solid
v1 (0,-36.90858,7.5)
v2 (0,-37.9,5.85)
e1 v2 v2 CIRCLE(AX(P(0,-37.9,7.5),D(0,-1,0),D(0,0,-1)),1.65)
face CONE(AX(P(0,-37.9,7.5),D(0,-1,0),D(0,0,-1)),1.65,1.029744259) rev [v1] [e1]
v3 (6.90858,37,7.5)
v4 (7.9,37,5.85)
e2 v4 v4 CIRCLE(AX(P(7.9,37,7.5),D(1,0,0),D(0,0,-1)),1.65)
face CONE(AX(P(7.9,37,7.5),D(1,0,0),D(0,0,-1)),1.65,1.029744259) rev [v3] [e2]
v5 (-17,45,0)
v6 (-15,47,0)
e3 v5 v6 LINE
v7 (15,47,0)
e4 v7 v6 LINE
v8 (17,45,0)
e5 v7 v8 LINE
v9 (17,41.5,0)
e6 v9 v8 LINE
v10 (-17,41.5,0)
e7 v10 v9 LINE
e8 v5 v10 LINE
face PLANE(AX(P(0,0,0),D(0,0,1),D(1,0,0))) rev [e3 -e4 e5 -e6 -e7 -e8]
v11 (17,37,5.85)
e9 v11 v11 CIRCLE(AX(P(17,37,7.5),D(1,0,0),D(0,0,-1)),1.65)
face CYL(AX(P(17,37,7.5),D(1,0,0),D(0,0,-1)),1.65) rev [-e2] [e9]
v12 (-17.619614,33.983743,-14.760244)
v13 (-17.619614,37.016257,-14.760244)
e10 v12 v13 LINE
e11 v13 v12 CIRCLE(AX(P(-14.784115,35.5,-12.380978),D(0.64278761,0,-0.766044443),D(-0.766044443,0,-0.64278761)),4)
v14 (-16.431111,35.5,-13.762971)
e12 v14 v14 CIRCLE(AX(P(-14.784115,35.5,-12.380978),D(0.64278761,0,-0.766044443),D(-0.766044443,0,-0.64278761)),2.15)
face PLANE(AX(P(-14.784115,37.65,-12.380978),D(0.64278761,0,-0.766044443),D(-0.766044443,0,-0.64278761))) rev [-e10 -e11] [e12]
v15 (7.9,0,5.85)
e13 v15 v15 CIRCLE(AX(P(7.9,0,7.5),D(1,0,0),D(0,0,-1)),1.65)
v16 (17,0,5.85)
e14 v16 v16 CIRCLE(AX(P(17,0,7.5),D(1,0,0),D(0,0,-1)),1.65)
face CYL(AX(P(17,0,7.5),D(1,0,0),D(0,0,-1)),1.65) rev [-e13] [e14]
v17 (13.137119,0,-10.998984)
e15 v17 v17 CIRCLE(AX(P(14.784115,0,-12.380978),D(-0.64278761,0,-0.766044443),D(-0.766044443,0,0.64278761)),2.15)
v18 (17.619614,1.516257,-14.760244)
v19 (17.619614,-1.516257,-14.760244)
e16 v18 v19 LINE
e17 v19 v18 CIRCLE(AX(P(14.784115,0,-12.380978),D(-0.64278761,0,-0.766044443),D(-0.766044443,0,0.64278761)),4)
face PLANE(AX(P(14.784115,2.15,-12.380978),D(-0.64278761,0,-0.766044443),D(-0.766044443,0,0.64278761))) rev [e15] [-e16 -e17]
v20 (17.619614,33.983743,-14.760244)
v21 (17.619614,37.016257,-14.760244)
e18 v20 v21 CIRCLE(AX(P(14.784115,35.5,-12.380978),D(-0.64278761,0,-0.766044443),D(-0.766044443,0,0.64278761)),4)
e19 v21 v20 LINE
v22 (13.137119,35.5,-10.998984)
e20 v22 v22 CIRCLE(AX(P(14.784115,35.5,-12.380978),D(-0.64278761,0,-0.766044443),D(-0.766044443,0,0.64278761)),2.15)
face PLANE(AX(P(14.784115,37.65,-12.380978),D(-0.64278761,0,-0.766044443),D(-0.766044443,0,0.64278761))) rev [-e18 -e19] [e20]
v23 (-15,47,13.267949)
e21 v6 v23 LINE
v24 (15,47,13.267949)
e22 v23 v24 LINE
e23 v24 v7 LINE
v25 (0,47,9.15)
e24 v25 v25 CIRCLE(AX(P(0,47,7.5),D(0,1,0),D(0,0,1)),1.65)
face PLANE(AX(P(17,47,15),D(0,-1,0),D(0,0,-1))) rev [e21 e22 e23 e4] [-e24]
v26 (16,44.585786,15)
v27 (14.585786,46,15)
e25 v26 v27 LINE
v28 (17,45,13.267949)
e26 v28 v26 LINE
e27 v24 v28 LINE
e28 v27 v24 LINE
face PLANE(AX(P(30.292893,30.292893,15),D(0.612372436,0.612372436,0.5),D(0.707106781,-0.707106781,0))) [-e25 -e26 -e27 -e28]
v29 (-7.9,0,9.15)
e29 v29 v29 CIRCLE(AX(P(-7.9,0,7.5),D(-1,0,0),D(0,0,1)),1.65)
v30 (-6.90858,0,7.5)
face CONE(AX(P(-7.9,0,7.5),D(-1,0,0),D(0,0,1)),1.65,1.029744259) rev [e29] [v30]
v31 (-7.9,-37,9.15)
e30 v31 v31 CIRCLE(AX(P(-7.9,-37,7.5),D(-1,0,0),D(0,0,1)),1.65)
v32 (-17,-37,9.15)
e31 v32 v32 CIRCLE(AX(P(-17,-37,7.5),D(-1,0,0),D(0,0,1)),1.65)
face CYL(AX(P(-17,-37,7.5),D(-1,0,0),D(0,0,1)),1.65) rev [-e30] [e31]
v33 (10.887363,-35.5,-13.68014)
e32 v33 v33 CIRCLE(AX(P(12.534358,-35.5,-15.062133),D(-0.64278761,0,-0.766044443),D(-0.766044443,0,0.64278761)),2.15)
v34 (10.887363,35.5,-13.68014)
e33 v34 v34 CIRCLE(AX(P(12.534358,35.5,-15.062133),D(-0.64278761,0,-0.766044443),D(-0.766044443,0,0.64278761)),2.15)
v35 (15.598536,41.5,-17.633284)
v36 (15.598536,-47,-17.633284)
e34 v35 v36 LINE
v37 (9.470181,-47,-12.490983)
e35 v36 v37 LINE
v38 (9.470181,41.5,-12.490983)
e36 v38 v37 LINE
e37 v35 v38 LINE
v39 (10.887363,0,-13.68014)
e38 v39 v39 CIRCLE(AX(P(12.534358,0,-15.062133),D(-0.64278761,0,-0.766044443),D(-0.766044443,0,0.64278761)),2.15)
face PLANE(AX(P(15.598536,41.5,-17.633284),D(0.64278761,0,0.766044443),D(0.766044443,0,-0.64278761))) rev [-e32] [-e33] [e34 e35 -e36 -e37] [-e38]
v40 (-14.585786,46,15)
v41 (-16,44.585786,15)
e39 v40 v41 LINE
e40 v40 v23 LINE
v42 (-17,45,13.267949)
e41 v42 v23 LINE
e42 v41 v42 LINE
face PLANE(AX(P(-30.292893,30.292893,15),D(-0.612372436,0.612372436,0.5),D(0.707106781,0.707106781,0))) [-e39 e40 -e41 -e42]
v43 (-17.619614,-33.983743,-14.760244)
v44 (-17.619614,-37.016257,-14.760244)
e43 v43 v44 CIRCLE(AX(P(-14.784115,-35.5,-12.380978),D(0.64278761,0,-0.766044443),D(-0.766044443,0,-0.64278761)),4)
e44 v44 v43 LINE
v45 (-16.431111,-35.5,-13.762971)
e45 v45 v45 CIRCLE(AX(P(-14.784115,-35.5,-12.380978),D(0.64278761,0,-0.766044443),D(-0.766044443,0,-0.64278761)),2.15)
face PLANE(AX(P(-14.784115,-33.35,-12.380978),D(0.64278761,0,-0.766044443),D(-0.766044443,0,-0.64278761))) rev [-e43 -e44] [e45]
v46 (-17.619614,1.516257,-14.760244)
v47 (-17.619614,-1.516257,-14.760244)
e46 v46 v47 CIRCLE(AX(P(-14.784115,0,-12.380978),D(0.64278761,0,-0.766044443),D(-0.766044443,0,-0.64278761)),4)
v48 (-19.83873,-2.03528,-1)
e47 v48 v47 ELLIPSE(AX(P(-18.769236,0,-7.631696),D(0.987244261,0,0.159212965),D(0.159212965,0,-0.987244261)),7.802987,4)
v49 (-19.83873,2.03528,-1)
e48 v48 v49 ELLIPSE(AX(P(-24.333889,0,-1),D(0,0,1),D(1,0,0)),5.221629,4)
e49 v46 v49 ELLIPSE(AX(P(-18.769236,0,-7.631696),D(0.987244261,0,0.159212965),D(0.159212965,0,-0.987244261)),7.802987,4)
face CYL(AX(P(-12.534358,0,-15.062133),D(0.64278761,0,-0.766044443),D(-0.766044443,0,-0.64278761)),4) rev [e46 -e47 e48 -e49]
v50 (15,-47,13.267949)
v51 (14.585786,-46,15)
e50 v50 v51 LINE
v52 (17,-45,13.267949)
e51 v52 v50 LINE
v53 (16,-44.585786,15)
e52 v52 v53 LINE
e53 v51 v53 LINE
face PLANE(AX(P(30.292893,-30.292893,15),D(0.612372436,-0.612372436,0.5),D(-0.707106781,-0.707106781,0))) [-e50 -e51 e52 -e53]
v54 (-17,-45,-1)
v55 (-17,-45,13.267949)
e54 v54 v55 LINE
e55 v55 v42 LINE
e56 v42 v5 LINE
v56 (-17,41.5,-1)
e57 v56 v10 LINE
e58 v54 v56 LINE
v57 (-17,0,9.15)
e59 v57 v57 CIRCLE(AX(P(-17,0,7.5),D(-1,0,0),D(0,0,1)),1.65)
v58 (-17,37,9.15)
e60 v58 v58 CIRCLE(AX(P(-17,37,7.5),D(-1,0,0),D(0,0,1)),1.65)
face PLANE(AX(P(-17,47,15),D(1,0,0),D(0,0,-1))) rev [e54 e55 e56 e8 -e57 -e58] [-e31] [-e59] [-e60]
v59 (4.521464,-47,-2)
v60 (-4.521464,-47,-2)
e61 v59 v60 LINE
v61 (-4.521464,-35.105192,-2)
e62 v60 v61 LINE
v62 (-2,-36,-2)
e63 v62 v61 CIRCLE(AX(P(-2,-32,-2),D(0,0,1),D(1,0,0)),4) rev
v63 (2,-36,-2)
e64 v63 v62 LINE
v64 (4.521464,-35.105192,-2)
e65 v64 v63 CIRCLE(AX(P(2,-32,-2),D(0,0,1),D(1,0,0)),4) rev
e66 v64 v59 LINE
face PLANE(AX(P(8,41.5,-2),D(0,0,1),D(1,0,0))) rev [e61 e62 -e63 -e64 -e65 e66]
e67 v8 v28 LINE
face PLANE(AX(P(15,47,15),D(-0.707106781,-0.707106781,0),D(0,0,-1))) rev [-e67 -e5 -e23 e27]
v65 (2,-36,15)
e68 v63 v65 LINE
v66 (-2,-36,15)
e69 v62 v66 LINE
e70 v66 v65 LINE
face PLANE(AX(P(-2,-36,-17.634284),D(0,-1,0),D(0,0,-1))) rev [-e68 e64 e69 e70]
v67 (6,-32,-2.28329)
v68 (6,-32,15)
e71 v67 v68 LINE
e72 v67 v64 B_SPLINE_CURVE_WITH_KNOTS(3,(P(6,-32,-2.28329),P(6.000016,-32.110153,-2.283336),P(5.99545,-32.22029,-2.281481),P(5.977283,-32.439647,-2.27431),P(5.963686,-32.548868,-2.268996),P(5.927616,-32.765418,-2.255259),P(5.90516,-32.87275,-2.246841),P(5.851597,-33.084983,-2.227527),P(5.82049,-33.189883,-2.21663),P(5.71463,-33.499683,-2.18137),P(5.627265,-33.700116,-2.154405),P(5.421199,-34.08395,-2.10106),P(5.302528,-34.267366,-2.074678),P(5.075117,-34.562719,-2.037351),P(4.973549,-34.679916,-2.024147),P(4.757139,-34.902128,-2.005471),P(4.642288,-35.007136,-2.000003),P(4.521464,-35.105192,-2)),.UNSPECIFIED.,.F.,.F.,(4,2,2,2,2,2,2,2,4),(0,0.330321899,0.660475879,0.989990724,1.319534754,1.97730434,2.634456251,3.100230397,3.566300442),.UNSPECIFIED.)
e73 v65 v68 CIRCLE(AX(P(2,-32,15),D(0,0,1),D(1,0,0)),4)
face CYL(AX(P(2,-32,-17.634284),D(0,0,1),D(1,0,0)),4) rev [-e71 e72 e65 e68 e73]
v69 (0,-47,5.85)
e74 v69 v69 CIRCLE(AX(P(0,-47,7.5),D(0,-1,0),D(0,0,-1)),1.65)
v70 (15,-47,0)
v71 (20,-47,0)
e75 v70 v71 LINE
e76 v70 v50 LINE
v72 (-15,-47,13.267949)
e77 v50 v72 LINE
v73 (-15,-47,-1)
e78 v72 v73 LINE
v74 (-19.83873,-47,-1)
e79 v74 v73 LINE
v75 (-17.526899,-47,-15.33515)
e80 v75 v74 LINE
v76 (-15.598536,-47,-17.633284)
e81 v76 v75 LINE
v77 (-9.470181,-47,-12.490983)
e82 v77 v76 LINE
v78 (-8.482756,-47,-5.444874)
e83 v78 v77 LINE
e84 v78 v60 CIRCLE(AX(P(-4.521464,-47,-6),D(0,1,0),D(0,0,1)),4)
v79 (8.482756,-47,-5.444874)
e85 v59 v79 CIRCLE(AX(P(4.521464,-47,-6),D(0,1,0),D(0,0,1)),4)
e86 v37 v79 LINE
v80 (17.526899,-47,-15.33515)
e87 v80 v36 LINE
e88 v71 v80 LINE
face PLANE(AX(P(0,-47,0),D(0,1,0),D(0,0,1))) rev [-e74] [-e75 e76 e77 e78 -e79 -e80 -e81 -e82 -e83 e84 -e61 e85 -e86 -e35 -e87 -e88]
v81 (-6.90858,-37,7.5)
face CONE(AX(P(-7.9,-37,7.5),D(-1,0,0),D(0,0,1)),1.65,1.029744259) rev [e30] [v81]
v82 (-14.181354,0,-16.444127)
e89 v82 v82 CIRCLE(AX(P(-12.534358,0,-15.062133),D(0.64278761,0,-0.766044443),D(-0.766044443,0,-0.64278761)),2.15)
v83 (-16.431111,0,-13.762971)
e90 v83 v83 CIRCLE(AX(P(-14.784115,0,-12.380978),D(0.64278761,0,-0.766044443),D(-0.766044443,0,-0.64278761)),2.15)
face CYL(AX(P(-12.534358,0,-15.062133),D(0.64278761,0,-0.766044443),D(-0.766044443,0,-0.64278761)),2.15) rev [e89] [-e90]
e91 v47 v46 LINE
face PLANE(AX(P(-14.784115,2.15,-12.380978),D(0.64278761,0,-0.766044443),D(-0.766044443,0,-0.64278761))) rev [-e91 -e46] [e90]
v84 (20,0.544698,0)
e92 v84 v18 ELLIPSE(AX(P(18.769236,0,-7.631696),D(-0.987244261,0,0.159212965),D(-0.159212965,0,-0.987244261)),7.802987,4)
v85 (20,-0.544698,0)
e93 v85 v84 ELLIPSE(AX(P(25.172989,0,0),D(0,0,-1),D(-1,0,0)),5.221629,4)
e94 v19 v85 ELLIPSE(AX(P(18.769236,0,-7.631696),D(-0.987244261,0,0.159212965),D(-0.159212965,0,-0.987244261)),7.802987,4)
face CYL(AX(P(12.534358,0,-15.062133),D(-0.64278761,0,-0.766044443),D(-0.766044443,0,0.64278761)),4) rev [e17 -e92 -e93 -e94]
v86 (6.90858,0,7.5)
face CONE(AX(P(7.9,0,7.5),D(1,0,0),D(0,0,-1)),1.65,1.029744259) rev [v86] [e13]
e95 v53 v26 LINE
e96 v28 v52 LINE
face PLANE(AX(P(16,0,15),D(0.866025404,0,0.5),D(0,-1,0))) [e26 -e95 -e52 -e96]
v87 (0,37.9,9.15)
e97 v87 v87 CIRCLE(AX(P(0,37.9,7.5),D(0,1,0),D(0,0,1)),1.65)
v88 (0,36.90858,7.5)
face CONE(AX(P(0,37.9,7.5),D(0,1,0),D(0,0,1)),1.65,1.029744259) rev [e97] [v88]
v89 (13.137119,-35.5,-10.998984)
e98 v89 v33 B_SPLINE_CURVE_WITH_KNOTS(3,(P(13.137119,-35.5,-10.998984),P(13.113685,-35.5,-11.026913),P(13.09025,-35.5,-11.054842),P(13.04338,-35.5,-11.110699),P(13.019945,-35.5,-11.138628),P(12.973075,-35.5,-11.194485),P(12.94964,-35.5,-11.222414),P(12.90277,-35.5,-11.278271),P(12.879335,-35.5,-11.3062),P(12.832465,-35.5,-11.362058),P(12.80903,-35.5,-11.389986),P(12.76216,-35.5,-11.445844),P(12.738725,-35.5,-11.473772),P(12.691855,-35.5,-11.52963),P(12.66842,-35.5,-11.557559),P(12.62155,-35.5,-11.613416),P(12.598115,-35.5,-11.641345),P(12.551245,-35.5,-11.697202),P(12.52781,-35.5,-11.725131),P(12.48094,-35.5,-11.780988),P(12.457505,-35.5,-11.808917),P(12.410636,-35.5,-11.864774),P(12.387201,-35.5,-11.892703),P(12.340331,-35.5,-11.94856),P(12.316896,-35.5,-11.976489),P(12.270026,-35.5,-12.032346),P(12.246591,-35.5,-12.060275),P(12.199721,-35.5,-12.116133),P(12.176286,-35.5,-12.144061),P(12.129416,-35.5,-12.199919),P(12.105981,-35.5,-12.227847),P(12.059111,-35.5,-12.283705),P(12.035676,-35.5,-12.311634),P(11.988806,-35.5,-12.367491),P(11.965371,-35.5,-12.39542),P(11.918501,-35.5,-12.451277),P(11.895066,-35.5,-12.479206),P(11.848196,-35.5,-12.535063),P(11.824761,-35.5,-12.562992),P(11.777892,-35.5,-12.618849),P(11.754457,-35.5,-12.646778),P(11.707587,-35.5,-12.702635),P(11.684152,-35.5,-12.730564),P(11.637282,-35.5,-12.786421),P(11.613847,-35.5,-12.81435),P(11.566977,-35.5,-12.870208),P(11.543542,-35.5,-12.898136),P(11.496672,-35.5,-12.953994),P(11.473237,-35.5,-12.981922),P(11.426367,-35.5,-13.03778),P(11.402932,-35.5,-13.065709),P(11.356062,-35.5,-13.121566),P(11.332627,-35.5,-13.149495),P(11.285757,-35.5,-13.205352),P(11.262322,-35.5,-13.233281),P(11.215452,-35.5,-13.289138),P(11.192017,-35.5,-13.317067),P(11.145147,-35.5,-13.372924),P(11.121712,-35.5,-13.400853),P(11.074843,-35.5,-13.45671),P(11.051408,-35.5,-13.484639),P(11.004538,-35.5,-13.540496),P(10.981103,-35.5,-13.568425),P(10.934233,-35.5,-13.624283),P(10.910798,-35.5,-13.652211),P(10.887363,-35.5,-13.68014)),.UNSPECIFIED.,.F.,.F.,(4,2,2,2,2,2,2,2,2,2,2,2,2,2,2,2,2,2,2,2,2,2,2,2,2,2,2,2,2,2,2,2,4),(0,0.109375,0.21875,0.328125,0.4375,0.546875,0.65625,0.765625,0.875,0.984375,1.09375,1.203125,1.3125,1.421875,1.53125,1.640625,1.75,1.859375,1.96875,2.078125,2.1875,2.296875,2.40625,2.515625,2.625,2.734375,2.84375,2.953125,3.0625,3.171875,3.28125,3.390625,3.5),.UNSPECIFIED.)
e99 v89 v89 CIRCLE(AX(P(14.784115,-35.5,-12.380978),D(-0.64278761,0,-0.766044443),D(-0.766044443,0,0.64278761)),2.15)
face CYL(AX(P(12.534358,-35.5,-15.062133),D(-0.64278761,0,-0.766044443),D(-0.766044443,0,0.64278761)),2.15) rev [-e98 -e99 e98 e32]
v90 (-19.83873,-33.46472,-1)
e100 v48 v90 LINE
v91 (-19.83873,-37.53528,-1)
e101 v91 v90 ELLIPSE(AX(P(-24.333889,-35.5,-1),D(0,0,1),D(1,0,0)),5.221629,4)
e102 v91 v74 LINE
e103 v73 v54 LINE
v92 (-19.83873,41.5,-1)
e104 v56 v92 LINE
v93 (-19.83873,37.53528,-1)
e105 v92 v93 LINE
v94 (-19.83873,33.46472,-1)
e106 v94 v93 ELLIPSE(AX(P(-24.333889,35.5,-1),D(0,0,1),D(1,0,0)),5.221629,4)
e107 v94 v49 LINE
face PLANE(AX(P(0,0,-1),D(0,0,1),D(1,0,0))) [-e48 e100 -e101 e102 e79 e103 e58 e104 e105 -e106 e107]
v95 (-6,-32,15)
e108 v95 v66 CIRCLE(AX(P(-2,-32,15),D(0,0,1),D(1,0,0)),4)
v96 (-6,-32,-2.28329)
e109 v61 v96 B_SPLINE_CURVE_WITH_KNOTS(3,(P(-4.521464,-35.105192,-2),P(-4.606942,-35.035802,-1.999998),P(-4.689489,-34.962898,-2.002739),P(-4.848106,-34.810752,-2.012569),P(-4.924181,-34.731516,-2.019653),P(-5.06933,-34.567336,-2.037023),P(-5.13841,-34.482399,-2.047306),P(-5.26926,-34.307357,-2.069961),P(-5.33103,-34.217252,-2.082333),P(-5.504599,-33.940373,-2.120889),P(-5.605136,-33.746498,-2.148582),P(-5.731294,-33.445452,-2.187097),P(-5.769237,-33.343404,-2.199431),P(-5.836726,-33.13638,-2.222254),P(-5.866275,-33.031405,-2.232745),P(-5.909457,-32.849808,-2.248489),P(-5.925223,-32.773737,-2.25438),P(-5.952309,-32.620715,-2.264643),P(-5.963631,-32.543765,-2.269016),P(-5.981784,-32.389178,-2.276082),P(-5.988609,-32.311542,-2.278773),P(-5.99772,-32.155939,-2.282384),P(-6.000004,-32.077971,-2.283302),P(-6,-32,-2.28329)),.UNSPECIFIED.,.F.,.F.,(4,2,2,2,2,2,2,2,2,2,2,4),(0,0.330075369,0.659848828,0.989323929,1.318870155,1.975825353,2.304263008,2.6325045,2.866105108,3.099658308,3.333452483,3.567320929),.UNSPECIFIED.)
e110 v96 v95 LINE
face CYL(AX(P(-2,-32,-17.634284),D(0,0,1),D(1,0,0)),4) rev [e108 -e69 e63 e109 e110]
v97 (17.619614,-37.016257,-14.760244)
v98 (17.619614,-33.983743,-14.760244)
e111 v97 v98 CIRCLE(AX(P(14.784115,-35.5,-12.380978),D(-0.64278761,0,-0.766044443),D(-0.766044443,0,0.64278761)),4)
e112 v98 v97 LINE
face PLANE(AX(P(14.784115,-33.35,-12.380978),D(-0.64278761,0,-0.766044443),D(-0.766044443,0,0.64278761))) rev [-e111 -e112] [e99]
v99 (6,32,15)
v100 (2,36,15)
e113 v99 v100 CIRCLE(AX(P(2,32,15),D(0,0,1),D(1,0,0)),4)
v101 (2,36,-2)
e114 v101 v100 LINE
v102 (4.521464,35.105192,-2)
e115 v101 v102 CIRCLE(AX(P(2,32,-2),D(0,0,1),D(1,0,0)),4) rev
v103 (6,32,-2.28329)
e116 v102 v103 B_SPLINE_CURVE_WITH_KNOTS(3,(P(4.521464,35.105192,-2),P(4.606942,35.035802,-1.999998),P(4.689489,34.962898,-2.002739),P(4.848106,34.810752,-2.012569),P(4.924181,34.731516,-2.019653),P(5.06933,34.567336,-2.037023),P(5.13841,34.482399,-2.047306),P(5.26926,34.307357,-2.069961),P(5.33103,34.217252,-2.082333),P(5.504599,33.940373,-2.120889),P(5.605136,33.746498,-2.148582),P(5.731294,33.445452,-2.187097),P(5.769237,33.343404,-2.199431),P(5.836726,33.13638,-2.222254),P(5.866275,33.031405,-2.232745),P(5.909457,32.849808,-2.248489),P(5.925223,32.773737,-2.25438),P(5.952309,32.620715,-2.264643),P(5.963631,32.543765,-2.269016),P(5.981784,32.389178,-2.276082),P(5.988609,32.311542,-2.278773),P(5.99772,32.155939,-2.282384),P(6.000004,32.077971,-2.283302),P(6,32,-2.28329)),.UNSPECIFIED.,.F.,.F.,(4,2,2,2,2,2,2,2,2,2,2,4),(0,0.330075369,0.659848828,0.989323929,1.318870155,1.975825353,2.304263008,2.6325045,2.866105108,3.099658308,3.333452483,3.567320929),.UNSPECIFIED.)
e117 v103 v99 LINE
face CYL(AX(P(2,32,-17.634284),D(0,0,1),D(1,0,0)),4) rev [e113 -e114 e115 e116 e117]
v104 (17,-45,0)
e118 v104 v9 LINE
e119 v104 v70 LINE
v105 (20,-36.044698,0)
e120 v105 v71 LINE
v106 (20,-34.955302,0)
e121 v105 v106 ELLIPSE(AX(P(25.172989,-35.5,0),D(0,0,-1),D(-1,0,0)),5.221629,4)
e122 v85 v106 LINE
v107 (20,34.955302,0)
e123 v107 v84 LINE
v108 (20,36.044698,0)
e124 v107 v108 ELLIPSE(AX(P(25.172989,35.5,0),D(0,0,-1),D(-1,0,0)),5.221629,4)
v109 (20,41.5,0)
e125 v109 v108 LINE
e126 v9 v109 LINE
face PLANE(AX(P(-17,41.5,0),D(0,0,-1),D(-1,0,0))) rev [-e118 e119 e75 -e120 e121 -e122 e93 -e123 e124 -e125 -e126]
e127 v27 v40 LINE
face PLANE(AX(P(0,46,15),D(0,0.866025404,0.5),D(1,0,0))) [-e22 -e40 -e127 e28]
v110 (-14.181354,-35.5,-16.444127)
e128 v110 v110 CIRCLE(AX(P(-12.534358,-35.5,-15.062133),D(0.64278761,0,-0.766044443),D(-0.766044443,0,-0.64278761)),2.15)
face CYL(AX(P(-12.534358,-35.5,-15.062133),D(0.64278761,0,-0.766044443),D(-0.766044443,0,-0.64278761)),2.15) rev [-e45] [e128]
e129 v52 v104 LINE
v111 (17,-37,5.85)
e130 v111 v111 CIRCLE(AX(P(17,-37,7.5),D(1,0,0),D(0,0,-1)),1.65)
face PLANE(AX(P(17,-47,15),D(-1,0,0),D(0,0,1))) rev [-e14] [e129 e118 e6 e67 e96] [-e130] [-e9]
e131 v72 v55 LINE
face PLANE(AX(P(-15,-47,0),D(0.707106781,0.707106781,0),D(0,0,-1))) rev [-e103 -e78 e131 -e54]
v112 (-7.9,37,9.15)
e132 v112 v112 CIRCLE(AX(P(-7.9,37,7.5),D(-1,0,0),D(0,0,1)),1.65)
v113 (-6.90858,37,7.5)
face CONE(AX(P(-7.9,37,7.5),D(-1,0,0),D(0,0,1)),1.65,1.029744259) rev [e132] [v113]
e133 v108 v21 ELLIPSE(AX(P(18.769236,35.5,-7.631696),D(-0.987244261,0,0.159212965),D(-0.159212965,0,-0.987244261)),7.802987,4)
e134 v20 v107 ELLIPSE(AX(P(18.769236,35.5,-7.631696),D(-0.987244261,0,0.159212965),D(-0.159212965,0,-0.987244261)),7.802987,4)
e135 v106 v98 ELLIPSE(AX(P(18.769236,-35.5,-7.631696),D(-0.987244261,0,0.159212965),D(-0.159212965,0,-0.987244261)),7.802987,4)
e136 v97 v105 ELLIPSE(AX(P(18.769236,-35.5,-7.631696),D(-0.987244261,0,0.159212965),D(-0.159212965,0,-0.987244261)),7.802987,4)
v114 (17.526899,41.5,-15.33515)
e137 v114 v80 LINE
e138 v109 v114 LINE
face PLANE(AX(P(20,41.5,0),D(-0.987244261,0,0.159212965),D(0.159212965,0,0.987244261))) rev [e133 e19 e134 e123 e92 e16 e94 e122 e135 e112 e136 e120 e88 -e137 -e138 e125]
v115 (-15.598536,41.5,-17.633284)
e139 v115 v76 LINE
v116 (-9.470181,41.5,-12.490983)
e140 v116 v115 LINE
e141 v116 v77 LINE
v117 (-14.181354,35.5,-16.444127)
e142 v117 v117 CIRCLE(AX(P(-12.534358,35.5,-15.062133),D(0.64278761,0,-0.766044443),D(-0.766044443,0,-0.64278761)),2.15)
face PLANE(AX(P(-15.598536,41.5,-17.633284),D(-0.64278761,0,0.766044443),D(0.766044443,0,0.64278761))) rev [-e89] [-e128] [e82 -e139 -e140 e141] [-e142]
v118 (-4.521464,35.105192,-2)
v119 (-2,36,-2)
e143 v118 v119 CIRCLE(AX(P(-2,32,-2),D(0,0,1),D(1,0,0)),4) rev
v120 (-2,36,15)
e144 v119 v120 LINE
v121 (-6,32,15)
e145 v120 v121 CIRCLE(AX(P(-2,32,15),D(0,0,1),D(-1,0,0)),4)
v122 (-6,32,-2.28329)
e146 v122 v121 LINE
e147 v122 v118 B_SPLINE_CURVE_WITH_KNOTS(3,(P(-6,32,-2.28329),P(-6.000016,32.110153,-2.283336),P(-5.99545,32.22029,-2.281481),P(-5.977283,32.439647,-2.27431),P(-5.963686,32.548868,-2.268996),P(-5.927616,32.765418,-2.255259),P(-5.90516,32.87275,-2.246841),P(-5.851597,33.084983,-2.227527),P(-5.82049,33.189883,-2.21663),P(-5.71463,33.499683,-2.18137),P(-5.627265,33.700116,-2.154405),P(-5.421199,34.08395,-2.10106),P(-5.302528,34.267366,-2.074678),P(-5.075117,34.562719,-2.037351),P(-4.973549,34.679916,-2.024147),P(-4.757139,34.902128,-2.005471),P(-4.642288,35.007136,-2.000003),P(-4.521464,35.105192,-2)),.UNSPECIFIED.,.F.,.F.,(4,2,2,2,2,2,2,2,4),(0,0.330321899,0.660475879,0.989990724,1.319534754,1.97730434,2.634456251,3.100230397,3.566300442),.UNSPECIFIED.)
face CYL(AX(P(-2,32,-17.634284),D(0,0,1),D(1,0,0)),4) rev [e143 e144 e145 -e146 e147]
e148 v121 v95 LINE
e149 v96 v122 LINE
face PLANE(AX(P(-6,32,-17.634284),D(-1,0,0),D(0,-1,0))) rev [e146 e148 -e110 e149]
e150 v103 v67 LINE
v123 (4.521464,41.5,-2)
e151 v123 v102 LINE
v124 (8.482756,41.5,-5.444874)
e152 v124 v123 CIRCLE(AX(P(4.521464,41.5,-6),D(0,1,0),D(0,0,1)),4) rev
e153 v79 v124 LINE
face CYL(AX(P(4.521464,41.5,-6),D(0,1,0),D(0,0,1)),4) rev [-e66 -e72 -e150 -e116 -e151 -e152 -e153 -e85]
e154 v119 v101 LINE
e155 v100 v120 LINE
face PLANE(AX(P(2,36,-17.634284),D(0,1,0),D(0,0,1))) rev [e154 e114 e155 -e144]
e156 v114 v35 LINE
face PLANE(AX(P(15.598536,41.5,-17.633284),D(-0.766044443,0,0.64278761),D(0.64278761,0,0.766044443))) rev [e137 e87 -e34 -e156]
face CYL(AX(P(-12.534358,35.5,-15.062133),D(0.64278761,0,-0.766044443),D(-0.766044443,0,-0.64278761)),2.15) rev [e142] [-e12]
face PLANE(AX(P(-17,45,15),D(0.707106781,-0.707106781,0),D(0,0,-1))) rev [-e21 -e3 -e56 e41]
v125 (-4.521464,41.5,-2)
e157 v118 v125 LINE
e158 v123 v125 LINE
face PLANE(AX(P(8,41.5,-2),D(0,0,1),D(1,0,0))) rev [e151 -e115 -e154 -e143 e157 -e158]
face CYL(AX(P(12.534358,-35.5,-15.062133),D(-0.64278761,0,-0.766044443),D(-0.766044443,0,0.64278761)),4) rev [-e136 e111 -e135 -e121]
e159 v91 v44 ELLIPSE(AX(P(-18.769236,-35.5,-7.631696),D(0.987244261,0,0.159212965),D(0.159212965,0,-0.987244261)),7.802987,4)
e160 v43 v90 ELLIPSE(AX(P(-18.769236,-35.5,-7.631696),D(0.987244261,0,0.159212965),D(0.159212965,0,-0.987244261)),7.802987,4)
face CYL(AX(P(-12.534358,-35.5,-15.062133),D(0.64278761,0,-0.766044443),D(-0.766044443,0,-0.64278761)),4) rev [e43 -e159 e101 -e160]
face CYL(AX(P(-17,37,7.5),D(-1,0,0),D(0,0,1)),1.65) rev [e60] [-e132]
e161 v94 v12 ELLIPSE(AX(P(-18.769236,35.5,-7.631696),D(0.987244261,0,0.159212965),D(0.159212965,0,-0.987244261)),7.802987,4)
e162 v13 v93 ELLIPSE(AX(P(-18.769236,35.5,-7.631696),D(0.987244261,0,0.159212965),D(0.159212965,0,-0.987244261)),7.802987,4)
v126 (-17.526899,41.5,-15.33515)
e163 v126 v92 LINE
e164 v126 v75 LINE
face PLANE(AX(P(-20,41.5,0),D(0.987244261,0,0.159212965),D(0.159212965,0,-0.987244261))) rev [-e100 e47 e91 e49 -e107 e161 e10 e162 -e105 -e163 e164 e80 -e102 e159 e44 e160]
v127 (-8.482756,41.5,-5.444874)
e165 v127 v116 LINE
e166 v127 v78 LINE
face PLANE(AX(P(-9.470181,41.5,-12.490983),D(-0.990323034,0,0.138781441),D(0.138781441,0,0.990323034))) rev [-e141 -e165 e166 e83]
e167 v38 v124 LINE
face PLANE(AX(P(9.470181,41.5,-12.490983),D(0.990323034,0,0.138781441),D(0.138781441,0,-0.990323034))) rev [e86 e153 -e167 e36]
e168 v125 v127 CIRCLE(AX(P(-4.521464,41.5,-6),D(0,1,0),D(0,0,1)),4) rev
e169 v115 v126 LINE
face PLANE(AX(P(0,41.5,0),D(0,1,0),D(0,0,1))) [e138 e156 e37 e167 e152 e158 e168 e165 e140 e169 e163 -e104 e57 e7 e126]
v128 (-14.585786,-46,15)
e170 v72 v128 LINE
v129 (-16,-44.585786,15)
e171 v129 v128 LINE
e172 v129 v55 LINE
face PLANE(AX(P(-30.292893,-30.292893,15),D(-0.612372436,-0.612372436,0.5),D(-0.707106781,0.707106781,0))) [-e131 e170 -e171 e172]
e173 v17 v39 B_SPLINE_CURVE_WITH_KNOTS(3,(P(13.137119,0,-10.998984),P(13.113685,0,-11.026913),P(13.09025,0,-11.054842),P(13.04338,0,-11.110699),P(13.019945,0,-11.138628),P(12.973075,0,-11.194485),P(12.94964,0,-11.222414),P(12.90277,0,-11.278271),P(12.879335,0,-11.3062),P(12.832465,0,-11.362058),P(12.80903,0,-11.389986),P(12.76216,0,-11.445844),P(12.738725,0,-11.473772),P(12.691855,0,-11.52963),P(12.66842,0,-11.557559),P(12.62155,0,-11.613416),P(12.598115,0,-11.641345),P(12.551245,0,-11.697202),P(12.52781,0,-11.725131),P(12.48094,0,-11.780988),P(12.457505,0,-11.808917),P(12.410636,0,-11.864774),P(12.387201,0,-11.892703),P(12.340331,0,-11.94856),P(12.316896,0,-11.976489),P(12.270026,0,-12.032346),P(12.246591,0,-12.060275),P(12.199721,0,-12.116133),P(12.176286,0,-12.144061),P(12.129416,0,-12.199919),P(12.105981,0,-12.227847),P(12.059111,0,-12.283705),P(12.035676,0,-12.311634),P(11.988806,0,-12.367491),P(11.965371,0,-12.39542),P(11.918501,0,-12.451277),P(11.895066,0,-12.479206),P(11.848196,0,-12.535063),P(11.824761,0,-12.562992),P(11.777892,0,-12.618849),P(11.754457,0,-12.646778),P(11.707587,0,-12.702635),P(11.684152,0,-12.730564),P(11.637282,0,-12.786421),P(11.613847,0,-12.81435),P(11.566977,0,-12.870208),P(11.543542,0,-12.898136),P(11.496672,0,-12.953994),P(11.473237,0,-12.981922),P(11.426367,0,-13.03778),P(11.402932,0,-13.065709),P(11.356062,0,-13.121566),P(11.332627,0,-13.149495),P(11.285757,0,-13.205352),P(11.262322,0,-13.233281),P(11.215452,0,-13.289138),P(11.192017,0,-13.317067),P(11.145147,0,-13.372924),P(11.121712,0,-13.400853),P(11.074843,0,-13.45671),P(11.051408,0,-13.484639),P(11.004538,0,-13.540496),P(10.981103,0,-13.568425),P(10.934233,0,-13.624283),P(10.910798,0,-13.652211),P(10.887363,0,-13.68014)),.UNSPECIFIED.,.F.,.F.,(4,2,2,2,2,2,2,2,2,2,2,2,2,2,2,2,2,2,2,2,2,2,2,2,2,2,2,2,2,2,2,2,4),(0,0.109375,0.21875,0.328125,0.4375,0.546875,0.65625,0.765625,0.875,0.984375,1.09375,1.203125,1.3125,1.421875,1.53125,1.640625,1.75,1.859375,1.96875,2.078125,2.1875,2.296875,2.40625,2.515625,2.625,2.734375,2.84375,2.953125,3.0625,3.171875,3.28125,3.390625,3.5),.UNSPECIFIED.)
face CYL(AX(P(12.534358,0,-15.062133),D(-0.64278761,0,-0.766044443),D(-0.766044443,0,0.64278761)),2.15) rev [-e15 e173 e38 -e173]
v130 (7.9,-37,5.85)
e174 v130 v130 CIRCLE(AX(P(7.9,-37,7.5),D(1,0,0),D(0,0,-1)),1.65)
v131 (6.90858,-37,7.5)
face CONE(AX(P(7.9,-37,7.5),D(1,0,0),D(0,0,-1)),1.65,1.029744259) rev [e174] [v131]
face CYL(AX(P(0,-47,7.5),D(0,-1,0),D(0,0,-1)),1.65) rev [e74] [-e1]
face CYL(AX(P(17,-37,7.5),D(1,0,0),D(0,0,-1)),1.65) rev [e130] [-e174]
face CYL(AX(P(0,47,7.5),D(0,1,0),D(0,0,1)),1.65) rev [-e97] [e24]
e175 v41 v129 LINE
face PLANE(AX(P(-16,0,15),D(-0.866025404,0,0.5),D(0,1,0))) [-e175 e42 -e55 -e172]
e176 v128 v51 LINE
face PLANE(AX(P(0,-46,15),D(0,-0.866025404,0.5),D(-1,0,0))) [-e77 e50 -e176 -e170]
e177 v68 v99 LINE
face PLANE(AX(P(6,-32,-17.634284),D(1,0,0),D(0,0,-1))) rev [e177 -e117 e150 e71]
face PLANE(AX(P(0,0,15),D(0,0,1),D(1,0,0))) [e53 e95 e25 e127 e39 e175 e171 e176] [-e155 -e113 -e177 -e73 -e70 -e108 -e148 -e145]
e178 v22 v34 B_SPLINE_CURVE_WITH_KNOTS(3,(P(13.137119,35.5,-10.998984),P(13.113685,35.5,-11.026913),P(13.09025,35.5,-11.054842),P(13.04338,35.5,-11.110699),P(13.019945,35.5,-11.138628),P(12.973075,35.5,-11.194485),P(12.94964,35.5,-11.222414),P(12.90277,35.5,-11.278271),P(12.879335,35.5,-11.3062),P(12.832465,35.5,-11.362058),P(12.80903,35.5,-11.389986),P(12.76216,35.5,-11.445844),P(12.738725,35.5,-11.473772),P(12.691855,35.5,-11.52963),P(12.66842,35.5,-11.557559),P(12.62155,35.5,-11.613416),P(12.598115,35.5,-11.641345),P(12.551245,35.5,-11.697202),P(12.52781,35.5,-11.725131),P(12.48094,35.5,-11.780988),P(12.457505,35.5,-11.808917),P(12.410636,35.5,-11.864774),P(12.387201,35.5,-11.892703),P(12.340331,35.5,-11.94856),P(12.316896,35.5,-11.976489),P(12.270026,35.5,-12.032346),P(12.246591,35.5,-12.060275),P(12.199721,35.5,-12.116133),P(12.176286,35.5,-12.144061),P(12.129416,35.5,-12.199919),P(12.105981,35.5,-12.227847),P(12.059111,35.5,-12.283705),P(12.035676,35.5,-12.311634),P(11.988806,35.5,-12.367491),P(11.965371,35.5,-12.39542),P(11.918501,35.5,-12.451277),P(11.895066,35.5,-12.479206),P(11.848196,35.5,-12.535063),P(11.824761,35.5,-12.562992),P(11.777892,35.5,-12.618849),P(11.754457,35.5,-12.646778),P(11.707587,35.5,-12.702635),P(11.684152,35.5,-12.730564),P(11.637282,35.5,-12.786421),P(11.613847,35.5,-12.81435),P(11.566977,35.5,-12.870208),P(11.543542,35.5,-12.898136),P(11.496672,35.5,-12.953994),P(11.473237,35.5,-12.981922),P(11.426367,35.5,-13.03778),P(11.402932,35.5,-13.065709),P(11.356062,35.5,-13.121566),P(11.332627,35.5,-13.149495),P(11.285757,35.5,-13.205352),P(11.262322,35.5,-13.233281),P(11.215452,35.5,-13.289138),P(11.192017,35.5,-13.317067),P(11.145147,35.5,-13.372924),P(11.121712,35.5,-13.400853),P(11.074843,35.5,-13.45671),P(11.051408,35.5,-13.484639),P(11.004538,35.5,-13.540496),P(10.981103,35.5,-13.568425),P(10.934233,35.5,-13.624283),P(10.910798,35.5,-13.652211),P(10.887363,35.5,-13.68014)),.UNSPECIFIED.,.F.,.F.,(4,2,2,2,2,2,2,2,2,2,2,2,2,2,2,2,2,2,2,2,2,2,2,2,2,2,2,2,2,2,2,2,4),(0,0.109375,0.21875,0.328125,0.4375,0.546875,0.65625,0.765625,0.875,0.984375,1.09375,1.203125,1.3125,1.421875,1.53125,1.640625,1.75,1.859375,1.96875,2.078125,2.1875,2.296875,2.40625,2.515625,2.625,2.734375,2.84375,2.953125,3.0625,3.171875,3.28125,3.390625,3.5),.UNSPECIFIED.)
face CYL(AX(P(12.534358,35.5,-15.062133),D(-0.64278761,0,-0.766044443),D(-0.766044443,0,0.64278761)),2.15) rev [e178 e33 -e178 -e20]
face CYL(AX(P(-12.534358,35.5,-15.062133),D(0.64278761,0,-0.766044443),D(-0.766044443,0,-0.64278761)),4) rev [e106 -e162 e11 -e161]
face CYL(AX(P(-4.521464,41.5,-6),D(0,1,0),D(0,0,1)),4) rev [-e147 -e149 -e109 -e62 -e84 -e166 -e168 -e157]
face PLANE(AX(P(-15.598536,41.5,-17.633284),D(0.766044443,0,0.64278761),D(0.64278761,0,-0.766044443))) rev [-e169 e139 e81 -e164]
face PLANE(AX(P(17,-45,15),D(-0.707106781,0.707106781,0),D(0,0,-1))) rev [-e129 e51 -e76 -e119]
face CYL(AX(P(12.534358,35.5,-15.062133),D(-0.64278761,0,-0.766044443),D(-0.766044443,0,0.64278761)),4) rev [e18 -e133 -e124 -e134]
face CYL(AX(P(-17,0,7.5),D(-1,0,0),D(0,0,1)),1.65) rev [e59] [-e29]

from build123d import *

# Parameters (mm, degrees)
BOSS_EXTRUDE1_DEPTH             = 41.5
BOSS_EXTRUDE1_DEPTH_BACK        = 47
SKETCH2_W                       = 34
SKETCH2_H                       = 94
BOSS_EXTRUDE2_DEPTH             = 15
SKETCH3_W                       = 50
SKETCH3_H                       = 88.5
CUT_EXTRUDE1_DEPTH              = 1
ADVANCEDHOLE1_START             = 0.018666706
ADVANCEDHOLE1_DEPTH             = 12.837085488
ADVANCEDHOLE1_START_2           = -3.481333294
ADVANCEDHOLE1_2_OUTLINE_R       = 2.15
ADVANCEDHOLE1_2_DEPTH           = 3.5
ADVANCEDHOLE2_START             = -11.986045339
ADVANCEDHOLE2_DEPTH             = 11.967378633
ADVANCEDHOLE2_START_2           = -0.018666706
ADVANCEDHOLE2_2_OUTLINE_R       = 2.15
ADVANCEDHOLE2_2_DEPTH           = 3.5
FILLET1_R                       = 4
M4_TAPPED_HOLE1_D               = 3.3
M4_TAPPED_HOLE1_DEPTH           = 9.1
M4_TAPPED_HOLE1_TIP             = 0.991420021
M4_TAPPED_HOLE1_ON_FACE_2_D     = 3.3
M4_TAPPED_HOLE1_ON_FACE_2_DEPTH = 9.1
M4_TAPPED_HOLE1_ON_FACE_2_TIP   = 0.991420021
M4_TAPPED_HOLE1_ON_FACE_3_D     = 3.3
M4_TAPPED_HOLE1_ON_FACE_3_DEPTH = 9.1
M4_TAPPED_HOLE1_ON_FACE_3_TIP   = 0.991420021
M4_TAPPED_HOLE1_ON_FACE_4_D     = 3.3
M4_TAPPED_HOLE1_ON_FACE_4_DEPTH = 9.1
M4_TAPPED_HOLE1_ON_FACE_4_TIP   = 0.991420021
CHAMFER1_SIZE                   = 2
CHAMFER2_SIZE                   = 1
CHAMFER2_SIZE2                  = 1.732050808
CUT_EXTRUDE2_REACH              = 62.613


# Read off the part's stored shape, not the designer's step: AdvancedHole1, AdvancedHole2
with BuildPart() as part:
    # Sketch1 → Boss-Extrude1 (new, two sides: drawn at the far end of the back side and taken through both)
    with BuildSketch(Plane(origin=(0, 0, 0), x_dir=(1, 0, 0), z_dir=(0, 1, 0)).offset(-BOSS_EXTRUDE1_DEPTH_BACK)):
        Polygon((17, 0), (20, 0), (17.52689899, 15.335150469), (15.598536161, 17.633283798), (9.470180616, 12.49098292), (8, 2), (-8, 2), (-9.470180616, 12.49098292), (-15.598536161, 17.633283798), (-17.52689899, 15.335150469), (-20, 0), (-17, 0), align=None)
    extrude(amount=BOSS_EXTRUDE1_DEPTH + BOSS_EXTRUDE1_DEPTH_BACK)

    # Sketch2 → Boss-Extrude2 (add)
    with BuildSketch(Plane.XY):
        Rectangle(SKETCH2_W, SKETCH2_H)
    extrude(amount=BOSS_EXTRUDE2_DEPTH)

    # Sketch3 → Cut-Extrude1 (cut)
    with BuildSketch(Plane.XY):
        with Locations((-42, -2.75)):
            Rectangle(SKETCH3_W, SKETCH3_H)
    extrude(amount=-CUT_EXTRUDE1_DEPTH, mode=Mode.SUBTRACT)

    # AdvancedHole1 outline → AdvancedHole1 (cut)
    with BuildSketch(Plane(origin=(0, 0, 0), x_dir=(0.7660444431189763, 0, -0.6427876096865414), z_dir=(0.6427876096865414, 0, 0.7660444431189763)).offset(ADVANCEDHOLE1_START)):
        with BuildLine():
            Line((22.985109569, 33.983742651), (23.606222085, 35.5))
            Line((23.606222085, 35.5), (22.985109569, 37.016257349))
            ThreePointArc((22.985109569, 37.016257349), (15.283628291, 35.5), (22.985109569, 33.983742651))
        make_face()
        with BuildLine():
            Line((22.985109569, -37.016257349), (23.606222085, -35.5))
            Line((23.606222085, -35.5), (22.985109569, -33.983742651))
            ThreePointArc((22.985109569, -33.983742651), (15.283628291, -35.5), (22.985109569, -37.016257349))
        make_face()
        with BuildLine():
            ThreePointArc((22.985109569, 1.516257349), (15.283628291, 0), (22.985109569, -1.516257349))
            Line((22.985109569, -1.516257349), (23.606222085, 0))
            Line((23.606222085, 0), (22.985109569, 1.516257349))
        make_face()
    extrude(amount=ADVANCEDHOLE1_DEPTH, mode=Mode.SUBTRACT)

    # AdvancedHole1 2 outline → AdvancedHole1 2 (cut)
    with BuildSketch(Plane(origin=(0, 0, 0), x_dir=(0.7660444431189763, 0, -0.6427876096865414), z_dir=(0.6427876096865414, 0, 0.7660444431189763)).offset(ADVANCEDHOLE1_START_2)):
        with Locations((19.283628291, 0)):
            Circle(ADVANCEDHOLE1_2_OUTLINE_R)
        with Locations((19.283628291, -35.5)):
            Circle(ADVANCEDHOLE1_2_OUTLINE_R)
        with Locations((19.283628291, 35.5)):
            Circle(ADVANCEDHOLE1_2_OUTLINE_R)
    extrude(amount=ADVANCEDHOLE1_2_DEPTH, mode=Mode.SUBTRACT)

    # AdvancedHole2 outline → AdvancedHole2 (cut)
    with BuildSketch(Plane(origin=(0, 0, 0), x_dir=(0.7660444431189767, 0, 0.6427876096865409), z_dir=(0.6427876096865409, 0, -0.7660444431189768)).offset(ADVANCEDHOLE2_START)):
        with BuildLine():
            Line((-23.606222085, 35.5), (-22.985109569, 33.983742651))
            ThreePointArc((-22.985109569, 33.983742651), (-15.283628291, 35.5), (-22.985109569, 37.016257349))
            Line((-22.985109569, 37.016257349), (-23.606222085, 35.5))
        make_face()
        with BuildLine():
            Line((-22.985109569, 1.516257349), (-23.606222085, 0))
            Line((-23.606222085, 0), (-22.985109569, -1.516257349))
            ThreePointArc((-22.985109569, -1.516257349), (-15.283628291, 0), (-22.985109569, 1.516257349))
        make_face()
        with BuildLine():
            Line((-22.985109569, -33.983742651), (-23.606222085, -35.5))
            Line((-23.606222085, -35.5), (-22.985109569, -37.016257349))
            ThreePointArc((-22.985109569, -37.016257349), (-15.283628291, -35.5), (-22.985109569, -33.983742651))
        make_face()
    extrude(amount=ADVANCEDHOLE2_DEPTH, mode=Mode.SUBTRACT)

    # AdvancedHole2 2 outline → AdvancedHole2 2 (cut)
    with BuildSketch(Plane(origin=(0, 0, 0), x_dir=(0.7660444431189767, 0, 0.6427876096865409), z_dir=(0.6427876096865409, 0, -0.7660444431189768)).offset(ADVANCEDHOLE2_START_2)):
        with Locations((-19.283628291, 35.5)):
            Circle(ADVANCEDHOLE2_2_OUTLINE_R)
        with Locations((-19.283628291, 0)):
            Circle(ADVANCEDHOLE2_2_OUTLINE_R)
        with Locations((-19.283628291, -35.5)):
            Circle(ADVANCEDHOLE2_2_OUTLINE_R)
    extrude(amount=ADVANCEDHOLE2_2_DEPTH, mode=Mode.SUBTRACT)

    # Fillet1
    fillet1_edges = [part.edges().sort_by_distance(p)[0] for p in [
        (-8, -2.75, -2),
        (8, -2.75, -2),
    ]]
    fillet(fillet1_edges, radius=FILLET1_R)

    # M4 Tapped Hole1
    with Locations(Plane(origin=(0, -47, 7.5), x_dir=(0, 0, -1), z_dir=(0, -1, 0))):
        with Locations((0, 0)):
            Hole(M4_TAPPED_HOLE1_D / 2, depth=M4_TAPPED_HOLE1_DEPTH)
            with Locations((0, 0, -(M4_TAPPED_HOLE1_DEPTH + M4_TAPPED_HOLE1_TIP / 2))):  # 118° drill point
                Cone(0, M4_TAPPED_HOLE1_D / 2, M4_TAPPED_HOLE1_TIP, mode=Mode.SUBTRACT)

    # M4 Tapped Hole1 on face 2
    with Locations(Plane(origin=(17, 37, 7.5), x_dir=(0, 0, 1), z_dir=(1, 0, 0))):
        with Locations((0, 0), (0, 74), (0, 37)):
            Hole(M4_TAPPED_HOLE1_ON_FACE_2_D / 2, depth=M4_TAPPED_HOLE1_ON_FACE_2_DEPTH)
            with Locations((0, 0, -(M4_TAPPED_HOLE1_ON_FACE_2_DEPTH + M4_TAPPED_HOLE1_ON_FACE_2_TIP / 2))):  # 118° drill point
                Cone(0, M4_TAPPED_HOLE1_ON_FACE_2_D / 2, M4_TAPPED_HOLE1_ON_FACE_2_TIP, mode=Mode.SUBTRACT)

    # M4 Tapped Hole1 on face 3
    with Locations(Plane(origin=(-17, -37, 7.5), x_dir=(0, 0, -1), z_dir=(-1, 0, 0))):
        with Locations((0, 0), (0, -74), (0, -37)):
            Hole(M4_TAPPED_HOLE1_ON_FACE_3_D / 2, depth=M4_TAPPED_HOLE1_ON_FACE_3_DEPTH)
            with Locations((0, 0, -(M4_TAPPED_HOLE1_ON_FACE_3_DEPTH + M4_TAPPED_HOLE1_ON_FACE_3_TIP / 2))):  # 118° drill point
                Cone(0, M4_TAPPED_HOLE1_ON_FACE_3_D / 2, M4_TAPPED_HOLE1_ON_FACE_3_TIP, mode=Mode.SUBTRACT)

    # M4 Tapped Hole1 on face 4
    with Locations(Plane(origin=(0, 47, 7.5), x_dir=(0, 0, 1), z_dir=(0, 1, 0))):
        with Locations((0, 0)):
            Hole(M4_TAPPED_HOLE1_ON_FACE_4_D / 2, depth=M4_TAPPED_HOLE1_ON_FACE_4_DEPTH)
            with Locations((0, 0, -(M4_TAPPED_HOLE1_ON_FACE_4_DEPTH + M4_TAPPED_HOLE1_ON_FACE_4_TIP / 2))):  # 118° drill point
                Cone(0, M4_TAPPED_HOLE1_ON_FACE_4_D / 2, M4_TAPPED_HOLE1_ON_FACE_4_TIP, mode=Mode.SUBTRACT)

    # Chamfer1
    chamfer1_edges = [part.edges().sort_by_distance(p)[0] for p in [
        (17, -47, 7.5),
        (17, 47, 7.5),
        (-17, 47, 7.5),
        (-17, -47, 7),
    ]]
    chamfer(chamfer1_edges, length=CHAMFER1_SIZE)

    # Chamfer2
    chamfer2_edges = [part.edges().sort_by_distance(p)[0] for p in [
        (17, 0, 15),
        (0, -47, 15),
        (0, 47, 15),
        (-17, 0, 15),
        (-16, 46, 15),
        (16, 46, 15),
        (-16, -46, 15),
        (16, -46, 15),
    ]]
    chamfer2_side = [part.faces().sort_by_distance(p)[0] for p in [
        (0, 0, 15),
    ]]
    chamfer(chamfer2_edges, length=CHAMFER2_SIZE, length2=CHAMFER2_SIZE2, reference=chamfer2_side[0])

    # Sketch9 → Cut-Extrude2 (cut, up to next)
    with BuildSketch(Plane.XY.offset(15), mode=Mode.PRIVATE) as cut_extrude2_sk1:
        with BuildLine():
            Line((-6, 32), (-6, -32))
            ThreePointArc((-6, -32), (-4.828427125, -34.828427125), (-2, -36))
            Line((-2, -36), (2, -36))
            ThreePointArc((2, -36), (4.828427125, -34.828427125), (6, -32))
            Line((6, -32), (6, 32))
            ThreePointArc((6, 32), (4.828427125, 34.828427125), (2, 36))
            Line((2, 36), (-2, 36))
            ThreePointArc((-2, 36), (-4.828427125, 34.828427125), (-6, 32))
        make_face()
    cut_extrude2_tool1 = extrude(cut_extrude2_sk1.sketch, amount=-CUT_EXTRUDE2_REACH, mode=Mode.PRIVATE) & part.part
    add(cut_extrude2_tool1.solids().sort_by_distance((0, 0, 15))[0], mode=Mode.SUBTRACT)


solid = part.part
